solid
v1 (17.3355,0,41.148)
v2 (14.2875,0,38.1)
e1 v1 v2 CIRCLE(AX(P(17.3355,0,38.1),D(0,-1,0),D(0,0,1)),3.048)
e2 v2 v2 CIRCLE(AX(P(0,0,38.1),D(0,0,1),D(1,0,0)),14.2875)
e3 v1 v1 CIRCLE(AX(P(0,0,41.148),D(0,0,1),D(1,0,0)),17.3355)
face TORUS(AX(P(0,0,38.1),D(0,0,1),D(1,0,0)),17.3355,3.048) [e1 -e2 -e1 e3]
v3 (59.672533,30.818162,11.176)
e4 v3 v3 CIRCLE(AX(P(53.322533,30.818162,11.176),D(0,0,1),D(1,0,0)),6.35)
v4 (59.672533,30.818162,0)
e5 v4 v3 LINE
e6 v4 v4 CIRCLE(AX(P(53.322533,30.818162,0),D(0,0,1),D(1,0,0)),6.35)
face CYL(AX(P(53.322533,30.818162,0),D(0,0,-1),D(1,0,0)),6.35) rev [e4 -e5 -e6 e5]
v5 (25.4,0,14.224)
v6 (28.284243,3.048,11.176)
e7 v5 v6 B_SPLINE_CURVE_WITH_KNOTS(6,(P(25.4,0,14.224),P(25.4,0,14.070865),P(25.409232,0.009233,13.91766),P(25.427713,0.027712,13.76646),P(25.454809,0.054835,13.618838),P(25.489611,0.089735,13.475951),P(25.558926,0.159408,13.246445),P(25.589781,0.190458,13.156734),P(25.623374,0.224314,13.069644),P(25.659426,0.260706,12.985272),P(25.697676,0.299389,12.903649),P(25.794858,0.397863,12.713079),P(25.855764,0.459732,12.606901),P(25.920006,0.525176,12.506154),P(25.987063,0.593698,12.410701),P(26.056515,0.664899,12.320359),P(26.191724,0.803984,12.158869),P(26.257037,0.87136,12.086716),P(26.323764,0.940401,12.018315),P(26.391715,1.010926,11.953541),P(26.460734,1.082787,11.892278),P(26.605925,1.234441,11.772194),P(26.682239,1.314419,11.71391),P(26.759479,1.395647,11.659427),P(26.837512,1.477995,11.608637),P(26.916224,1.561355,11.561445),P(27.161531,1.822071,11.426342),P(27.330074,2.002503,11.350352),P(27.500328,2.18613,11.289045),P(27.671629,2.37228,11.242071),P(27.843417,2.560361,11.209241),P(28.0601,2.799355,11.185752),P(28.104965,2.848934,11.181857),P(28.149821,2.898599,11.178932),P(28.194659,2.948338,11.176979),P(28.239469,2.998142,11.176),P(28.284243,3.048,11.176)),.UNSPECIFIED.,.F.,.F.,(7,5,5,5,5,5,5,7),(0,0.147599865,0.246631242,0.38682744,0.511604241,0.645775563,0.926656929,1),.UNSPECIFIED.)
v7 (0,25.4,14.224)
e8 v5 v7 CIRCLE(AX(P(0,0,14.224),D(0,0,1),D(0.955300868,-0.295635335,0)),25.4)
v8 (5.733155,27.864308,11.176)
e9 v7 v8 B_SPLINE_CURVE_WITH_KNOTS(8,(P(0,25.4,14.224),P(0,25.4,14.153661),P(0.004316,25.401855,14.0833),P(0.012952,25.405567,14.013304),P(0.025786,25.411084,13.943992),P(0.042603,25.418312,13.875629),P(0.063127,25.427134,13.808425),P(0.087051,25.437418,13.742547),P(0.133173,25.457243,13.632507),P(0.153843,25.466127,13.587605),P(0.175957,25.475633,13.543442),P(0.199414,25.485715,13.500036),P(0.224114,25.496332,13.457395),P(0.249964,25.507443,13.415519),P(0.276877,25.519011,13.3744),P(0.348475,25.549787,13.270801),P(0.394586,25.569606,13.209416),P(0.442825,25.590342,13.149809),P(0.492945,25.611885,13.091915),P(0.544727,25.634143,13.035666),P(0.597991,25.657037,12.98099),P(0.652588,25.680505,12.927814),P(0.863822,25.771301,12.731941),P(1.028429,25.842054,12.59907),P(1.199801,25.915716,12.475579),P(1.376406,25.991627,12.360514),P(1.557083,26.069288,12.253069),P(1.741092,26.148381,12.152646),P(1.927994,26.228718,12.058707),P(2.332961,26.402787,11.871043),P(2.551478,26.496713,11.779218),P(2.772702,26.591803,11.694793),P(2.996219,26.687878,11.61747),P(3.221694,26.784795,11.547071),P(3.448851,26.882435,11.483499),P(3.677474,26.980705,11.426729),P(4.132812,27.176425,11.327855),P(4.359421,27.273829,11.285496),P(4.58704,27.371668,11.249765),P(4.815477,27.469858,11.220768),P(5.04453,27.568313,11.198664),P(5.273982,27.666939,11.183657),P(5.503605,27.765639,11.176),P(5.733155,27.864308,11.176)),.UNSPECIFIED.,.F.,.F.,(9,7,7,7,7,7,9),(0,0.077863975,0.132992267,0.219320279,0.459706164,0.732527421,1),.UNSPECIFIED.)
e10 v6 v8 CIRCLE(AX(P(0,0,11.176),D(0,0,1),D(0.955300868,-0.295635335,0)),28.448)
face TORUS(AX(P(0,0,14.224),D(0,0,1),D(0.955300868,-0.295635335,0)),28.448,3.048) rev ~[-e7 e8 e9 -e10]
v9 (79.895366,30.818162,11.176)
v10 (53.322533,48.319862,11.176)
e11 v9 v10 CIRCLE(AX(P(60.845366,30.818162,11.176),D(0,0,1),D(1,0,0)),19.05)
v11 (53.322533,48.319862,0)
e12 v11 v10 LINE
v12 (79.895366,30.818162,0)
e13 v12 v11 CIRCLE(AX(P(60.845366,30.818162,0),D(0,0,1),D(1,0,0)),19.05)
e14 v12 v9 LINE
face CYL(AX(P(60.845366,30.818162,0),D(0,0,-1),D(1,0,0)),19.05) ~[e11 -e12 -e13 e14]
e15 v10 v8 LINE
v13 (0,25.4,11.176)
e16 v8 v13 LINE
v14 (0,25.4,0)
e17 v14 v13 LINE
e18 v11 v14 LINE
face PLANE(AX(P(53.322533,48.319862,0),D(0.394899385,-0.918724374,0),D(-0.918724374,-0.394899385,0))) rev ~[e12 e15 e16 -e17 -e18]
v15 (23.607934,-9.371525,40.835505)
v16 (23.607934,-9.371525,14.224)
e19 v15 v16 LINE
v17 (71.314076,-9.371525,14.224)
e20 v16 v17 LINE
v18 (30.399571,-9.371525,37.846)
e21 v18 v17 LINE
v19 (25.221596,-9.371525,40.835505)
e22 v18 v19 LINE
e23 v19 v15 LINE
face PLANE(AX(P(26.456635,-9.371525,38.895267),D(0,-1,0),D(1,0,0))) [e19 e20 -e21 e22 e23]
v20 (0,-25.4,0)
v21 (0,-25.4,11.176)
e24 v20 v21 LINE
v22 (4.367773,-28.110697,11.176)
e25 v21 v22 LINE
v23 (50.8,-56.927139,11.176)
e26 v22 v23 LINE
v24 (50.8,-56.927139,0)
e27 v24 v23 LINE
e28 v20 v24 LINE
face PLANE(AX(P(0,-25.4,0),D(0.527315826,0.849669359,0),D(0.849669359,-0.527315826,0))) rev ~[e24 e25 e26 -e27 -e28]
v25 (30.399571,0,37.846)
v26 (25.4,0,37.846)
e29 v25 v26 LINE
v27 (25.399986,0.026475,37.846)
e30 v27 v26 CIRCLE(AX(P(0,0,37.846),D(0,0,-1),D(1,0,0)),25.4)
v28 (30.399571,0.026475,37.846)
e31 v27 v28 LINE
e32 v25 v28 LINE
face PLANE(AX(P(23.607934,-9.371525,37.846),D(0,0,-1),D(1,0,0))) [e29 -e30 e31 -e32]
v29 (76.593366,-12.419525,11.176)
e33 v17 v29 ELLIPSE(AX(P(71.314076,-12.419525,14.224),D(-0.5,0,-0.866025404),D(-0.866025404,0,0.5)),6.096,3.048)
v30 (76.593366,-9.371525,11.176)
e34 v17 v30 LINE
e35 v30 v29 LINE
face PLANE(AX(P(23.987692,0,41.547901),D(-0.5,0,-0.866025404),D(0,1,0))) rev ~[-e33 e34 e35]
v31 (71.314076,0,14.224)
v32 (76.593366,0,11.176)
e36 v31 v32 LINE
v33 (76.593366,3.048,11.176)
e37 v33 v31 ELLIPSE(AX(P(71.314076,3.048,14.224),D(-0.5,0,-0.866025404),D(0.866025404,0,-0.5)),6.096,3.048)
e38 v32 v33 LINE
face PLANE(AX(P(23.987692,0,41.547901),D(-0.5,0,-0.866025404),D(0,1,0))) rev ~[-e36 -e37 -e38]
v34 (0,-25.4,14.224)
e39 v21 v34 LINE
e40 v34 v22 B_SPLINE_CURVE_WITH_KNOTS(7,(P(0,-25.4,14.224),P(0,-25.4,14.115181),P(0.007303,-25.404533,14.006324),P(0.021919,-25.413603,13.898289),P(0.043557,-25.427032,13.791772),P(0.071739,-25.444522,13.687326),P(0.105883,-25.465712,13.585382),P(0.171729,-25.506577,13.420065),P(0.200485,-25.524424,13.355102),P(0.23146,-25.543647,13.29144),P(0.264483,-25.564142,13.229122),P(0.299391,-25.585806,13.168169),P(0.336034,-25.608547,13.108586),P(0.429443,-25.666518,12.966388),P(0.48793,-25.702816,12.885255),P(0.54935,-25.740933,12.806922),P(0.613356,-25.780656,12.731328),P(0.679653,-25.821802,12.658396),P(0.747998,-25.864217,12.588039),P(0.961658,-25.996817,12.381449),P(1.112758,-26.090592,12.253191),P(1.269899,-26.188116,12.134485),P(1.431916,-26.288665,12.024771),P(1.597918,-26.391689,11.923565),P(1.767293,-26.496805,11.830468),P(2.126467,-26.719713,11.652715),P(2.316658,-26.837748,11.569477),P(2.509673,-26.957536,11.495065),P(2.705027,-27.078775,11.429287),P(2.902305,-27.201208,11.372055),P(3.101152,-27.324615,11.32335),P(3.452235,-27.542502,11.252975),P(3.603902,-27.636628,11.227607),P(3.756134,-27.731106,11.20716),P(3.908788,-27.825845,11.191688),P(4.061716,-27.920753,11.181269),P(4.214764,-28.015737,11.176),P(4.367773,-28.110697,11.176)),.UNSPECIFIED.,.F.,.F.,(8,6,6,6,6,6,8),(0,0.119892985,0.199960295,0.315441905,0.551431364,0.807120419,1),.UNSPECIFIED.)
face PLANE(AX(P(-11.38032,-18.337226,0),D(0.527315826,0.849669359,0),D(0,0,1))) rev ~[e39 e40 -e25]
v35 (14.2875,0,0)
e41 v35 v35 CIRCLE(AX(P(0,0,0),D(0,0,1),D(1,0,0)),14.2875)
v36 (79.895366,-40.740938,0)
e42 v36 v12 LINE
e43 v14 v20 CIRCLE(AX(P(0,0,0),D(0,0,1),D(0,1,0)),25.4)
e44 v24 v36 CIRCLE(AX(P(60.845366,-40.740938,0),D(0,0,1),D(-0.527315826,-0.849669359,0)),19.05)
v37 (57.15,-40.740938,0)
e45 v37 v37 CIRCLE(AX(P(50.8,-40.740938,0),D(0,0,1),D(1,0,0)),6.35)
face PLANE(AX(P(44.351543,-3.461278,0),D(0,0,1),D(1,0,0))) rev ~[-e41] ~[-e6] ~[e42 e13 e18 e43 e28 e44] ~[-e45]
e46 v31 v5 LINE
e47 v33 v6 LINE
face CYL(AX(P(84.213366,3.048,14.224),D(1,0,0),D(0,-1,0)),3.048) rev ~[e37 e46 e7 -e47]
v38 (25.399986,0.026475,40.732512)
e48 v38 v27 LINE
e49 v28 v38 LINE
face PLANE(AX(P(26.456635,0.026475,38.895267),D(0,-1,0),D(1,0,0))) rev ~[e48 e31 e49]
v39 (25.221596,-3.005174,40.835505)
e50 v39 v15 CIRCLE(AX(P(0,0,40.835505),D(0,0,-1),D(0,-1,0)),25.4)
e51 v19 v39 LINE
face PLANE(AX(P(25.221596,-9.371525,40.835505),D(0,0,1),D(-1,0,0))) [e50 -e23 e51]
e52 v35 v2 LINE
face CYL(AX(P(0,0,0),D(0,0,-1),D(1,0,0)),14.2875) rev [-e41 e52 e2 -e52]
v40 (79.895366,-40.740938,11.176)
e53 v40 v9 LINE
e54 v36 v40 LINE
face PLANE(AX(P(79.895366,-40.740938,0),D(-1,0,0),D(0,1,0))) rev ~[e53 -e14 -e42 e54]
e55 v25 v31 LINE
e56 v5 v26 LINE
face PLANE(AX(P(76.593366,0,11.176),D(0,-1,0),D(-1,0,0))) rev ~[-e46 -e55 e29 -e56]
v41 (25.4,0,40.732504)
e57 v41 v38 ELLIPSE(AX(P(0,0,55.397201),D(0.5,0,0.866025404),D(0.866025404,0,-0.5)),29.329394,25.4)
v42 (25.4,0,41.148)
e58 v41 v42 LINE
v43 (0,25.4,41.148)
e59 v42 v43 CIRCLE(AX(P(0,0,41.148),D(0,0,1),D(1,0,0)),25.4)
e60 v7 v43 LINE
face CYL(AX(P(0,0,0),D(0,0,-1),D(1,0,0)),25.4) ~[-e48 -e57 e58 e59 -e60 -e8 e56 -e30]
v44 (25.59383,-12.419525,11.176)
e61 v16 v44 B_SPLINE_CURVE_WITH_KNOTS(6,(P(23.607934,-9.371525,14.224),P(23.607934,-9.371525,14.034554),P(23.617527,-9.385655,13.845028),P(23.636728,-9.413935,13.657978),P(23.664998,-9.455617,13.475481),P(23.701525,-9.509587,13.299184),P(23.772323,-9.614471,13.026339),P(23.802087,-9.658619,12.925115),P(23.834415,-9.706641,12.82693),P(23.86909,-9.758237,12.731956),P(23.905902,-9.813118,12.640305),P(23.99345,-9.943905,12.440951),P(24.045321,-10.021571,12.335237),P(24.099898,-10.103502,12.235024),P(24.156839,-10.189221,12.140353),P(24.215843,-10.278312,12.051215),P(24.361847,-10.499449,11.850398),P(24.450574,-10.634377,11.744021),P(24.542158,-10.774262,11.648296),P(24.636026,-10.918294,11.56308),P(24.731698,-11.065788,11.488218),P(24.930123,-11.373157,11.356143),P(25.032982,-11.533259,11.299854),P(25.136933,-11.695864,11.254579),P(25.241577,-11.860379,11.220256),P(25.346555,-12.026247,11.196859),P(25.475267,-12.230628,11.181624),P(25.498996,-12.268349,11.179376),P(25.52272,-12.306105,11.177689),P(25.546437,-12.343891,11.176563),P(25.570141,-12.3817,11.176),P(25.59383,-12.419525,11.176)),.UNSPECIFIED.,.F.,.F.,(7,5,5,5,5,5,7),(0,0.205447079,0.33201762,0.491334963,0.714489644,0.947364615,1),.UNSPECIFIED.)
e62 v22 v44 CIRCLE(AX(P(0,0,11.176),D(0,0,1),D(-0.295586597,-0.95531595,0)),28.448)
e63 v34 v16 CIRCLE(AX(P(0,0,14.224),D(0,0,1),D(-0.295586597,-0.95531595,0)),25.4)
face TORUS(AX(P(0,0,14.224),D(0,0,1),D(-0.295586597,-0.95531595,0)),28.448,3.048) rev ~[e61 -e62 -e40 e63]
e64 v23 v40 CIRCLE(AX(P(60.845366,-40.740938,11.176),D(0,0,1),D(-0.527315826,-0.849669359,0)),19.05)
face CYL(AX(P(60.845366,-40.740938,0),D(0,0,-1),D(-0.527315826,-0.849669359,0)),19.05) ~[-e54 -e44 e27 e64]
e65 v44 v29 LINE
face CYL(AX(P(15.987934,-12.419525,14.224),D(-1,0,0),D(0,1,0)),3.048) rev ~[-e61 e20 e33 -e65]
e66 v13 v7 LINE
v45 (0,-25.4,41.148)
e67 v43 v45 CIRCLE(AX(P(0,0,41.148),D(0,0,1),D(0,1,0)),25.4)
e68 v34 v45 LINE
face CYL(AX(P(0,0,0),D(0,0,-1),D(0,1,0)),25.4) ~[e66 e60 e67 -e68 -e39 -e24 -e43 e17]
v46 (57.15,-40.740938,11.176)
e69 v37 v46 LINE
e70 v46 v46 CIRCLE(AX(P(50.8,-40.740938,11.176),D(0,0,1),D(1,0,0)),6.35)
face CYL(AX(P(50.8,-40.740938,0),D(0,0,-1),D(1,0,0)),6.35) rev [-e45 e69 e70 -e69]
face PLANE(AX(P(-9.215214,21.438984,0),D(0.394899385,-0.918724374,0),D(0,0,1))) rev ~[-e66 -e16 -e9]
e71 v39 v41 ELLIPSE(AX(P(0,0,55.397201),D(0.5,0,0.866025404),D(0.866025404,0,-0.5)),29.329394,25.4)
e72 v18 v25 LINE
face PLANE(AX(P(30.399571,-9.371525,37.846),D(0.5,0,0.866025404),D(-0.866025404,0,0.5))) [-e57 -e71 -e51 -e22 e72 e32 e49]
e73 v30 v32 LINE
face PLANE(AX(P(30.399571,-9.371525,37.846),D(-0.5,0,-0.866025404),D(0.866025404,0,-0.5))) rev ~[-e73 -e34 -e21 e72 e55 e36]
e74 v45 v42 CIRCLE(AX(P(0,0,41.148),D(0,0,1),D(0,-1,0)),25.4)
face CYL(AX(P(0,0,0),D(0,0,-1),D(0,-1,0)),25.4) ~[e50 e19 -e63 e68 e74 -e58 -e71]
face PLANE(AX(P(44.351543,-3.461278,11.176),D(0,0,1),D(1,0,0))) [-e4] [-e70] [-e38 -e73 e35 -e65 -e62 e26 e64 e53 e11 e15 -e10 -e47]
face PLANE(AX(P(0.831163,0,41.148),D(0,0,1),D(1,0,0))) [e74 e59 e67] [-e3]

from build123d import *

# Parameters (mm, degrees)
F0_R         = 14.2875
F1_DEPTH     = 41.148
F0_R_2       = 6.35
F2_DEPTH     = 11.176
F4_DEPTH     = 26.67
F6_DEPTH     = 25.4
F7_DEPTH     = 9.398
F8_T4_DEPTH  = 66.4333664876
F8_T9_ANGLE  = 124.391277417
F8_T14_DEPTH = 68.2254329645
F8_T19_ANGLE = 102.7340831682


# Not quite as in the source:
# - a fillet or chamfer that OpenCascade refuses, or shapes differently, is made with other operations: its cross-section is extruded or revolved along the edge and cut away or added


with BuildPart() as f1:
    # F0 (on Top) → F1 (new body)
    with BuildSketch(Plane.XY):
        with BuildLine():
            ThreePointArc((0, -25.4), (17.9605122421, -17.9605122421), (25.4, 0))
            ThreePointArc((25.4, 0), (17.9605122421, 17.9605122421), (0, 25.4))
            ThreePointArc((0, 25.4), (-25.4, 0), (0, -25.4))
        make_face()
        Circle(F0_R, mode=Mode.SUBTRACT)
    extrude(amount=F1_DEPTH)

    # F0 (on Top) → F2 (join)
    with BuildSketch(Plane.XY):
        with BuildLine():
            ThreePointArc((0, 25.4), (17.9605122421, 17.9605122421), (25.4, 0))
            ThreePointArc((25.4, 0), (17.9605122421, -17.9605122421), (0, -25.4))
            Line((0, -25.4), (50.8, -56.9271389808))
            ThreePointArc((50.8, -56.9271389808), (70.1065291687, -57.388260775), (79.8953664876, -40.740937693))
            Line((79.8953664876, -40.740937693), (79.8953664876, 30.8181623129))
            ThreePointArc((79.8953664876, 30.8181623129), (71.3237376894, 46.7274752131), (53.3225332112, 48.3198616445))
            Line((53.3225332112, 48.3198616445), (0, 25.4))
        make_face()
        with Locations((50.8, -40.740937693)):
            Circle(F0_R_2, mode=Mode.SUBTRACT)
        with Locations((53.3225332112, 30.8181623129)):
            Circle(F0_R_2, mode=Mode.SUBTRACT)
    extrude(amount=F2_DEPTH)

    # F3 (on face) → F4 (join)
    with BuildSketch(Plane.XY.offset(11.176)):
        with BuildLine():
            Line((76.5933664876, -9.3715246767), (76.5933664876, 0))
            Line((76.5933664876, 0), (25.4, 0))
            ThreePointArc((25.4, 0), (24.9479609536, -4.77066497), (23.6079335232, -9.3715246767))
            Line((23.6079335232, -9.3715246767), (76.5933664876, -9.3715246767))
        make_face()
    extrude(amount=F4_DEPTH)

    # F5 (on face) → F6 (cut)
    with BuildSketch(Plane.XZ.offset(9.3715246767)):
        Polygon((76.5933664876, 37.846), (30.3995714498, 37.846), (76.5933664876, 11.176), align=None)
    extrude(amount=-F6_DEPTH, mode=Mode.SUBTRACT)

    # F5 (on face) → F7 (join)
    with BuildSketch(Plane.XZ.offset(9.3715246767)):
        Polygon((30.3995714498, 37.846), (25.2215964692, 40.8355052489), (23.6079335232, 40.8355052489), (23.6079335232, 37.846), align=None)
    extrude(amount=-F7_DEPTH)

    # F8: fillet of radius 3.048 on 5 edges, made by hand


with BuildPart() as f8_tool2:
    # F8_s3 → F8_t4 (new body)
    with BuildSketch(Plane.YZ.offset(84.2133664876)):
        with BuildLine():
            ThreePointArc((0, 14.224), (0.8927385309, 12.0687385309), (3.048, 11.176))
            Line((3.048, 11.176), (0, 11.176))
            Line((0, 11.176), (0, 14.224))
        make_face()
    extrude(amount=-F8_T4_DEPTH)

    split(bisect_by=Plane(origin=(23.9876915783, 0, 41.5479005698), x_dir=(0, 1, 0), z_dir=(-0.5, 0, -0.8660254038)), keep=Keep.TOP)


with BuildPart() as f1_1:
    add(f1.part)

    # F8_t1: union F8_tool2
    add(f8_tool2.part)


with BuildPart() as f8_tool7:
    # F8_s8 → F8_t9 (revolve)
    with BuildSketch(Plane(origin=(0, 0, 0), x_dir=(0, 0, 1), z_dir=(-0.2956353345, -0.9553008683, 0))):
        with BuildLine():
            ThreePointArc((14.224, -25.4), (12.0687385309, -26.2927385309), (11.176, -28.448))
            Line((11.176, -28.448), (11.176, -25.4))
            Line((11.176, -25.4), (14.224, -25.4))
        make_face()
    revolve(axis=Axis((0, 0, 11.176), (0, 0, 1)), revolution_arc=F8_T9_ANGLE)

    split(bisect_by=Plane(origin=(-9.2152137271, 21.4389836917, 0), x_dir=(0, 0, 1), z_dir=(0.3948993846, -0.9187243744, 0)), keep=Keep.TOP)


with BuildPart() as f1_2:
    add(f1_1.part)

    # F8_t6: union F8_tool7
    add(f8_tool7.part)


with BuildPart() as f8_tool12:
    # F8_s13 → F8_t14 (new body)
    with BuildSketch(Plane.YZ.offset(15.9879335232)):
        with BuildLine():
            ThreePointArc((-9.3715246767, 14.224), (-10.2642632076, 12.0687385309), (-12.4195246767, 11.176))
            Line((-12.4195246767, 11.176), (-9.3715246767, 11.176))
            Line((-9.3715246767, 11.176), (-9.3715246767, 14.224))
        make_face()
    extrude(amount=F8_T14_DEPTH)

    split(bisect_by=Plane(origin=(23.9876915783, 0, 41.5479005698), x_dir=(0, 1, 0), z_dir=(-0.5, 0, -0.8660254038)), keep=Keep.TOP)


with BuildPart() as f1_3:
    add(f1_2.part)

    # F8_t11: union F8_tool12
    add(f8_tool12.part)


with BuildPart() as f8_tool17:
    # F8_s18 → F8_t19 (revolve)
    with BuildSketch(Plane(origin=(0, 0, 0), x_dir=(0, 0, 1), z_dir=(-0.9553159496, 0.2955865973, 0))):
        with BuildLine():
            ThreePointArc((14.224, -25.4), (12.0687385309, -26.2927385309), (11.176, -28.448))
            Line((11.176, -28.448), (11.176, -25.4))
            Line((11.176, -25.4), (14.224, -25.4))
        make_face()
    revolve(axis=Axis((0, 0, 11.176), (0, 0, 1)), revolution_arc=F8_T19_ANGLE)

    split(bisect_by=Plane(origin=(-11.3803201385, -18.3372256958, 0), x_dir=(0, 0, 1), z_dir=(0.5273158261, 0.8496693589, 0)), keep=Keep.TOP)


with BuildPart() as f1_4:
    add(f1_3.part)

    # F8_t16: union F8_tool17
    add(f8_tool17.part)

    # F8_s21 → F8_t22 (revolve, cut)
    with BuildSketch(Plane.XZ):
        with BuildLine():
            ThreePointArc((17.3355, 41.148), (15.1802385309, 40.2552614691), (14.2875, 38.1))
            Line((14.2875, 38.1), (14.2875, 41.148))
            Line((14.2875, 41.148), (17.3355, 41.148))
        make_face()
    revolve(axis=Axis((0, 0, 41.148), (0, 0, 1)), mode=Mode.SUBTRACT)


solid = f1_4.part
